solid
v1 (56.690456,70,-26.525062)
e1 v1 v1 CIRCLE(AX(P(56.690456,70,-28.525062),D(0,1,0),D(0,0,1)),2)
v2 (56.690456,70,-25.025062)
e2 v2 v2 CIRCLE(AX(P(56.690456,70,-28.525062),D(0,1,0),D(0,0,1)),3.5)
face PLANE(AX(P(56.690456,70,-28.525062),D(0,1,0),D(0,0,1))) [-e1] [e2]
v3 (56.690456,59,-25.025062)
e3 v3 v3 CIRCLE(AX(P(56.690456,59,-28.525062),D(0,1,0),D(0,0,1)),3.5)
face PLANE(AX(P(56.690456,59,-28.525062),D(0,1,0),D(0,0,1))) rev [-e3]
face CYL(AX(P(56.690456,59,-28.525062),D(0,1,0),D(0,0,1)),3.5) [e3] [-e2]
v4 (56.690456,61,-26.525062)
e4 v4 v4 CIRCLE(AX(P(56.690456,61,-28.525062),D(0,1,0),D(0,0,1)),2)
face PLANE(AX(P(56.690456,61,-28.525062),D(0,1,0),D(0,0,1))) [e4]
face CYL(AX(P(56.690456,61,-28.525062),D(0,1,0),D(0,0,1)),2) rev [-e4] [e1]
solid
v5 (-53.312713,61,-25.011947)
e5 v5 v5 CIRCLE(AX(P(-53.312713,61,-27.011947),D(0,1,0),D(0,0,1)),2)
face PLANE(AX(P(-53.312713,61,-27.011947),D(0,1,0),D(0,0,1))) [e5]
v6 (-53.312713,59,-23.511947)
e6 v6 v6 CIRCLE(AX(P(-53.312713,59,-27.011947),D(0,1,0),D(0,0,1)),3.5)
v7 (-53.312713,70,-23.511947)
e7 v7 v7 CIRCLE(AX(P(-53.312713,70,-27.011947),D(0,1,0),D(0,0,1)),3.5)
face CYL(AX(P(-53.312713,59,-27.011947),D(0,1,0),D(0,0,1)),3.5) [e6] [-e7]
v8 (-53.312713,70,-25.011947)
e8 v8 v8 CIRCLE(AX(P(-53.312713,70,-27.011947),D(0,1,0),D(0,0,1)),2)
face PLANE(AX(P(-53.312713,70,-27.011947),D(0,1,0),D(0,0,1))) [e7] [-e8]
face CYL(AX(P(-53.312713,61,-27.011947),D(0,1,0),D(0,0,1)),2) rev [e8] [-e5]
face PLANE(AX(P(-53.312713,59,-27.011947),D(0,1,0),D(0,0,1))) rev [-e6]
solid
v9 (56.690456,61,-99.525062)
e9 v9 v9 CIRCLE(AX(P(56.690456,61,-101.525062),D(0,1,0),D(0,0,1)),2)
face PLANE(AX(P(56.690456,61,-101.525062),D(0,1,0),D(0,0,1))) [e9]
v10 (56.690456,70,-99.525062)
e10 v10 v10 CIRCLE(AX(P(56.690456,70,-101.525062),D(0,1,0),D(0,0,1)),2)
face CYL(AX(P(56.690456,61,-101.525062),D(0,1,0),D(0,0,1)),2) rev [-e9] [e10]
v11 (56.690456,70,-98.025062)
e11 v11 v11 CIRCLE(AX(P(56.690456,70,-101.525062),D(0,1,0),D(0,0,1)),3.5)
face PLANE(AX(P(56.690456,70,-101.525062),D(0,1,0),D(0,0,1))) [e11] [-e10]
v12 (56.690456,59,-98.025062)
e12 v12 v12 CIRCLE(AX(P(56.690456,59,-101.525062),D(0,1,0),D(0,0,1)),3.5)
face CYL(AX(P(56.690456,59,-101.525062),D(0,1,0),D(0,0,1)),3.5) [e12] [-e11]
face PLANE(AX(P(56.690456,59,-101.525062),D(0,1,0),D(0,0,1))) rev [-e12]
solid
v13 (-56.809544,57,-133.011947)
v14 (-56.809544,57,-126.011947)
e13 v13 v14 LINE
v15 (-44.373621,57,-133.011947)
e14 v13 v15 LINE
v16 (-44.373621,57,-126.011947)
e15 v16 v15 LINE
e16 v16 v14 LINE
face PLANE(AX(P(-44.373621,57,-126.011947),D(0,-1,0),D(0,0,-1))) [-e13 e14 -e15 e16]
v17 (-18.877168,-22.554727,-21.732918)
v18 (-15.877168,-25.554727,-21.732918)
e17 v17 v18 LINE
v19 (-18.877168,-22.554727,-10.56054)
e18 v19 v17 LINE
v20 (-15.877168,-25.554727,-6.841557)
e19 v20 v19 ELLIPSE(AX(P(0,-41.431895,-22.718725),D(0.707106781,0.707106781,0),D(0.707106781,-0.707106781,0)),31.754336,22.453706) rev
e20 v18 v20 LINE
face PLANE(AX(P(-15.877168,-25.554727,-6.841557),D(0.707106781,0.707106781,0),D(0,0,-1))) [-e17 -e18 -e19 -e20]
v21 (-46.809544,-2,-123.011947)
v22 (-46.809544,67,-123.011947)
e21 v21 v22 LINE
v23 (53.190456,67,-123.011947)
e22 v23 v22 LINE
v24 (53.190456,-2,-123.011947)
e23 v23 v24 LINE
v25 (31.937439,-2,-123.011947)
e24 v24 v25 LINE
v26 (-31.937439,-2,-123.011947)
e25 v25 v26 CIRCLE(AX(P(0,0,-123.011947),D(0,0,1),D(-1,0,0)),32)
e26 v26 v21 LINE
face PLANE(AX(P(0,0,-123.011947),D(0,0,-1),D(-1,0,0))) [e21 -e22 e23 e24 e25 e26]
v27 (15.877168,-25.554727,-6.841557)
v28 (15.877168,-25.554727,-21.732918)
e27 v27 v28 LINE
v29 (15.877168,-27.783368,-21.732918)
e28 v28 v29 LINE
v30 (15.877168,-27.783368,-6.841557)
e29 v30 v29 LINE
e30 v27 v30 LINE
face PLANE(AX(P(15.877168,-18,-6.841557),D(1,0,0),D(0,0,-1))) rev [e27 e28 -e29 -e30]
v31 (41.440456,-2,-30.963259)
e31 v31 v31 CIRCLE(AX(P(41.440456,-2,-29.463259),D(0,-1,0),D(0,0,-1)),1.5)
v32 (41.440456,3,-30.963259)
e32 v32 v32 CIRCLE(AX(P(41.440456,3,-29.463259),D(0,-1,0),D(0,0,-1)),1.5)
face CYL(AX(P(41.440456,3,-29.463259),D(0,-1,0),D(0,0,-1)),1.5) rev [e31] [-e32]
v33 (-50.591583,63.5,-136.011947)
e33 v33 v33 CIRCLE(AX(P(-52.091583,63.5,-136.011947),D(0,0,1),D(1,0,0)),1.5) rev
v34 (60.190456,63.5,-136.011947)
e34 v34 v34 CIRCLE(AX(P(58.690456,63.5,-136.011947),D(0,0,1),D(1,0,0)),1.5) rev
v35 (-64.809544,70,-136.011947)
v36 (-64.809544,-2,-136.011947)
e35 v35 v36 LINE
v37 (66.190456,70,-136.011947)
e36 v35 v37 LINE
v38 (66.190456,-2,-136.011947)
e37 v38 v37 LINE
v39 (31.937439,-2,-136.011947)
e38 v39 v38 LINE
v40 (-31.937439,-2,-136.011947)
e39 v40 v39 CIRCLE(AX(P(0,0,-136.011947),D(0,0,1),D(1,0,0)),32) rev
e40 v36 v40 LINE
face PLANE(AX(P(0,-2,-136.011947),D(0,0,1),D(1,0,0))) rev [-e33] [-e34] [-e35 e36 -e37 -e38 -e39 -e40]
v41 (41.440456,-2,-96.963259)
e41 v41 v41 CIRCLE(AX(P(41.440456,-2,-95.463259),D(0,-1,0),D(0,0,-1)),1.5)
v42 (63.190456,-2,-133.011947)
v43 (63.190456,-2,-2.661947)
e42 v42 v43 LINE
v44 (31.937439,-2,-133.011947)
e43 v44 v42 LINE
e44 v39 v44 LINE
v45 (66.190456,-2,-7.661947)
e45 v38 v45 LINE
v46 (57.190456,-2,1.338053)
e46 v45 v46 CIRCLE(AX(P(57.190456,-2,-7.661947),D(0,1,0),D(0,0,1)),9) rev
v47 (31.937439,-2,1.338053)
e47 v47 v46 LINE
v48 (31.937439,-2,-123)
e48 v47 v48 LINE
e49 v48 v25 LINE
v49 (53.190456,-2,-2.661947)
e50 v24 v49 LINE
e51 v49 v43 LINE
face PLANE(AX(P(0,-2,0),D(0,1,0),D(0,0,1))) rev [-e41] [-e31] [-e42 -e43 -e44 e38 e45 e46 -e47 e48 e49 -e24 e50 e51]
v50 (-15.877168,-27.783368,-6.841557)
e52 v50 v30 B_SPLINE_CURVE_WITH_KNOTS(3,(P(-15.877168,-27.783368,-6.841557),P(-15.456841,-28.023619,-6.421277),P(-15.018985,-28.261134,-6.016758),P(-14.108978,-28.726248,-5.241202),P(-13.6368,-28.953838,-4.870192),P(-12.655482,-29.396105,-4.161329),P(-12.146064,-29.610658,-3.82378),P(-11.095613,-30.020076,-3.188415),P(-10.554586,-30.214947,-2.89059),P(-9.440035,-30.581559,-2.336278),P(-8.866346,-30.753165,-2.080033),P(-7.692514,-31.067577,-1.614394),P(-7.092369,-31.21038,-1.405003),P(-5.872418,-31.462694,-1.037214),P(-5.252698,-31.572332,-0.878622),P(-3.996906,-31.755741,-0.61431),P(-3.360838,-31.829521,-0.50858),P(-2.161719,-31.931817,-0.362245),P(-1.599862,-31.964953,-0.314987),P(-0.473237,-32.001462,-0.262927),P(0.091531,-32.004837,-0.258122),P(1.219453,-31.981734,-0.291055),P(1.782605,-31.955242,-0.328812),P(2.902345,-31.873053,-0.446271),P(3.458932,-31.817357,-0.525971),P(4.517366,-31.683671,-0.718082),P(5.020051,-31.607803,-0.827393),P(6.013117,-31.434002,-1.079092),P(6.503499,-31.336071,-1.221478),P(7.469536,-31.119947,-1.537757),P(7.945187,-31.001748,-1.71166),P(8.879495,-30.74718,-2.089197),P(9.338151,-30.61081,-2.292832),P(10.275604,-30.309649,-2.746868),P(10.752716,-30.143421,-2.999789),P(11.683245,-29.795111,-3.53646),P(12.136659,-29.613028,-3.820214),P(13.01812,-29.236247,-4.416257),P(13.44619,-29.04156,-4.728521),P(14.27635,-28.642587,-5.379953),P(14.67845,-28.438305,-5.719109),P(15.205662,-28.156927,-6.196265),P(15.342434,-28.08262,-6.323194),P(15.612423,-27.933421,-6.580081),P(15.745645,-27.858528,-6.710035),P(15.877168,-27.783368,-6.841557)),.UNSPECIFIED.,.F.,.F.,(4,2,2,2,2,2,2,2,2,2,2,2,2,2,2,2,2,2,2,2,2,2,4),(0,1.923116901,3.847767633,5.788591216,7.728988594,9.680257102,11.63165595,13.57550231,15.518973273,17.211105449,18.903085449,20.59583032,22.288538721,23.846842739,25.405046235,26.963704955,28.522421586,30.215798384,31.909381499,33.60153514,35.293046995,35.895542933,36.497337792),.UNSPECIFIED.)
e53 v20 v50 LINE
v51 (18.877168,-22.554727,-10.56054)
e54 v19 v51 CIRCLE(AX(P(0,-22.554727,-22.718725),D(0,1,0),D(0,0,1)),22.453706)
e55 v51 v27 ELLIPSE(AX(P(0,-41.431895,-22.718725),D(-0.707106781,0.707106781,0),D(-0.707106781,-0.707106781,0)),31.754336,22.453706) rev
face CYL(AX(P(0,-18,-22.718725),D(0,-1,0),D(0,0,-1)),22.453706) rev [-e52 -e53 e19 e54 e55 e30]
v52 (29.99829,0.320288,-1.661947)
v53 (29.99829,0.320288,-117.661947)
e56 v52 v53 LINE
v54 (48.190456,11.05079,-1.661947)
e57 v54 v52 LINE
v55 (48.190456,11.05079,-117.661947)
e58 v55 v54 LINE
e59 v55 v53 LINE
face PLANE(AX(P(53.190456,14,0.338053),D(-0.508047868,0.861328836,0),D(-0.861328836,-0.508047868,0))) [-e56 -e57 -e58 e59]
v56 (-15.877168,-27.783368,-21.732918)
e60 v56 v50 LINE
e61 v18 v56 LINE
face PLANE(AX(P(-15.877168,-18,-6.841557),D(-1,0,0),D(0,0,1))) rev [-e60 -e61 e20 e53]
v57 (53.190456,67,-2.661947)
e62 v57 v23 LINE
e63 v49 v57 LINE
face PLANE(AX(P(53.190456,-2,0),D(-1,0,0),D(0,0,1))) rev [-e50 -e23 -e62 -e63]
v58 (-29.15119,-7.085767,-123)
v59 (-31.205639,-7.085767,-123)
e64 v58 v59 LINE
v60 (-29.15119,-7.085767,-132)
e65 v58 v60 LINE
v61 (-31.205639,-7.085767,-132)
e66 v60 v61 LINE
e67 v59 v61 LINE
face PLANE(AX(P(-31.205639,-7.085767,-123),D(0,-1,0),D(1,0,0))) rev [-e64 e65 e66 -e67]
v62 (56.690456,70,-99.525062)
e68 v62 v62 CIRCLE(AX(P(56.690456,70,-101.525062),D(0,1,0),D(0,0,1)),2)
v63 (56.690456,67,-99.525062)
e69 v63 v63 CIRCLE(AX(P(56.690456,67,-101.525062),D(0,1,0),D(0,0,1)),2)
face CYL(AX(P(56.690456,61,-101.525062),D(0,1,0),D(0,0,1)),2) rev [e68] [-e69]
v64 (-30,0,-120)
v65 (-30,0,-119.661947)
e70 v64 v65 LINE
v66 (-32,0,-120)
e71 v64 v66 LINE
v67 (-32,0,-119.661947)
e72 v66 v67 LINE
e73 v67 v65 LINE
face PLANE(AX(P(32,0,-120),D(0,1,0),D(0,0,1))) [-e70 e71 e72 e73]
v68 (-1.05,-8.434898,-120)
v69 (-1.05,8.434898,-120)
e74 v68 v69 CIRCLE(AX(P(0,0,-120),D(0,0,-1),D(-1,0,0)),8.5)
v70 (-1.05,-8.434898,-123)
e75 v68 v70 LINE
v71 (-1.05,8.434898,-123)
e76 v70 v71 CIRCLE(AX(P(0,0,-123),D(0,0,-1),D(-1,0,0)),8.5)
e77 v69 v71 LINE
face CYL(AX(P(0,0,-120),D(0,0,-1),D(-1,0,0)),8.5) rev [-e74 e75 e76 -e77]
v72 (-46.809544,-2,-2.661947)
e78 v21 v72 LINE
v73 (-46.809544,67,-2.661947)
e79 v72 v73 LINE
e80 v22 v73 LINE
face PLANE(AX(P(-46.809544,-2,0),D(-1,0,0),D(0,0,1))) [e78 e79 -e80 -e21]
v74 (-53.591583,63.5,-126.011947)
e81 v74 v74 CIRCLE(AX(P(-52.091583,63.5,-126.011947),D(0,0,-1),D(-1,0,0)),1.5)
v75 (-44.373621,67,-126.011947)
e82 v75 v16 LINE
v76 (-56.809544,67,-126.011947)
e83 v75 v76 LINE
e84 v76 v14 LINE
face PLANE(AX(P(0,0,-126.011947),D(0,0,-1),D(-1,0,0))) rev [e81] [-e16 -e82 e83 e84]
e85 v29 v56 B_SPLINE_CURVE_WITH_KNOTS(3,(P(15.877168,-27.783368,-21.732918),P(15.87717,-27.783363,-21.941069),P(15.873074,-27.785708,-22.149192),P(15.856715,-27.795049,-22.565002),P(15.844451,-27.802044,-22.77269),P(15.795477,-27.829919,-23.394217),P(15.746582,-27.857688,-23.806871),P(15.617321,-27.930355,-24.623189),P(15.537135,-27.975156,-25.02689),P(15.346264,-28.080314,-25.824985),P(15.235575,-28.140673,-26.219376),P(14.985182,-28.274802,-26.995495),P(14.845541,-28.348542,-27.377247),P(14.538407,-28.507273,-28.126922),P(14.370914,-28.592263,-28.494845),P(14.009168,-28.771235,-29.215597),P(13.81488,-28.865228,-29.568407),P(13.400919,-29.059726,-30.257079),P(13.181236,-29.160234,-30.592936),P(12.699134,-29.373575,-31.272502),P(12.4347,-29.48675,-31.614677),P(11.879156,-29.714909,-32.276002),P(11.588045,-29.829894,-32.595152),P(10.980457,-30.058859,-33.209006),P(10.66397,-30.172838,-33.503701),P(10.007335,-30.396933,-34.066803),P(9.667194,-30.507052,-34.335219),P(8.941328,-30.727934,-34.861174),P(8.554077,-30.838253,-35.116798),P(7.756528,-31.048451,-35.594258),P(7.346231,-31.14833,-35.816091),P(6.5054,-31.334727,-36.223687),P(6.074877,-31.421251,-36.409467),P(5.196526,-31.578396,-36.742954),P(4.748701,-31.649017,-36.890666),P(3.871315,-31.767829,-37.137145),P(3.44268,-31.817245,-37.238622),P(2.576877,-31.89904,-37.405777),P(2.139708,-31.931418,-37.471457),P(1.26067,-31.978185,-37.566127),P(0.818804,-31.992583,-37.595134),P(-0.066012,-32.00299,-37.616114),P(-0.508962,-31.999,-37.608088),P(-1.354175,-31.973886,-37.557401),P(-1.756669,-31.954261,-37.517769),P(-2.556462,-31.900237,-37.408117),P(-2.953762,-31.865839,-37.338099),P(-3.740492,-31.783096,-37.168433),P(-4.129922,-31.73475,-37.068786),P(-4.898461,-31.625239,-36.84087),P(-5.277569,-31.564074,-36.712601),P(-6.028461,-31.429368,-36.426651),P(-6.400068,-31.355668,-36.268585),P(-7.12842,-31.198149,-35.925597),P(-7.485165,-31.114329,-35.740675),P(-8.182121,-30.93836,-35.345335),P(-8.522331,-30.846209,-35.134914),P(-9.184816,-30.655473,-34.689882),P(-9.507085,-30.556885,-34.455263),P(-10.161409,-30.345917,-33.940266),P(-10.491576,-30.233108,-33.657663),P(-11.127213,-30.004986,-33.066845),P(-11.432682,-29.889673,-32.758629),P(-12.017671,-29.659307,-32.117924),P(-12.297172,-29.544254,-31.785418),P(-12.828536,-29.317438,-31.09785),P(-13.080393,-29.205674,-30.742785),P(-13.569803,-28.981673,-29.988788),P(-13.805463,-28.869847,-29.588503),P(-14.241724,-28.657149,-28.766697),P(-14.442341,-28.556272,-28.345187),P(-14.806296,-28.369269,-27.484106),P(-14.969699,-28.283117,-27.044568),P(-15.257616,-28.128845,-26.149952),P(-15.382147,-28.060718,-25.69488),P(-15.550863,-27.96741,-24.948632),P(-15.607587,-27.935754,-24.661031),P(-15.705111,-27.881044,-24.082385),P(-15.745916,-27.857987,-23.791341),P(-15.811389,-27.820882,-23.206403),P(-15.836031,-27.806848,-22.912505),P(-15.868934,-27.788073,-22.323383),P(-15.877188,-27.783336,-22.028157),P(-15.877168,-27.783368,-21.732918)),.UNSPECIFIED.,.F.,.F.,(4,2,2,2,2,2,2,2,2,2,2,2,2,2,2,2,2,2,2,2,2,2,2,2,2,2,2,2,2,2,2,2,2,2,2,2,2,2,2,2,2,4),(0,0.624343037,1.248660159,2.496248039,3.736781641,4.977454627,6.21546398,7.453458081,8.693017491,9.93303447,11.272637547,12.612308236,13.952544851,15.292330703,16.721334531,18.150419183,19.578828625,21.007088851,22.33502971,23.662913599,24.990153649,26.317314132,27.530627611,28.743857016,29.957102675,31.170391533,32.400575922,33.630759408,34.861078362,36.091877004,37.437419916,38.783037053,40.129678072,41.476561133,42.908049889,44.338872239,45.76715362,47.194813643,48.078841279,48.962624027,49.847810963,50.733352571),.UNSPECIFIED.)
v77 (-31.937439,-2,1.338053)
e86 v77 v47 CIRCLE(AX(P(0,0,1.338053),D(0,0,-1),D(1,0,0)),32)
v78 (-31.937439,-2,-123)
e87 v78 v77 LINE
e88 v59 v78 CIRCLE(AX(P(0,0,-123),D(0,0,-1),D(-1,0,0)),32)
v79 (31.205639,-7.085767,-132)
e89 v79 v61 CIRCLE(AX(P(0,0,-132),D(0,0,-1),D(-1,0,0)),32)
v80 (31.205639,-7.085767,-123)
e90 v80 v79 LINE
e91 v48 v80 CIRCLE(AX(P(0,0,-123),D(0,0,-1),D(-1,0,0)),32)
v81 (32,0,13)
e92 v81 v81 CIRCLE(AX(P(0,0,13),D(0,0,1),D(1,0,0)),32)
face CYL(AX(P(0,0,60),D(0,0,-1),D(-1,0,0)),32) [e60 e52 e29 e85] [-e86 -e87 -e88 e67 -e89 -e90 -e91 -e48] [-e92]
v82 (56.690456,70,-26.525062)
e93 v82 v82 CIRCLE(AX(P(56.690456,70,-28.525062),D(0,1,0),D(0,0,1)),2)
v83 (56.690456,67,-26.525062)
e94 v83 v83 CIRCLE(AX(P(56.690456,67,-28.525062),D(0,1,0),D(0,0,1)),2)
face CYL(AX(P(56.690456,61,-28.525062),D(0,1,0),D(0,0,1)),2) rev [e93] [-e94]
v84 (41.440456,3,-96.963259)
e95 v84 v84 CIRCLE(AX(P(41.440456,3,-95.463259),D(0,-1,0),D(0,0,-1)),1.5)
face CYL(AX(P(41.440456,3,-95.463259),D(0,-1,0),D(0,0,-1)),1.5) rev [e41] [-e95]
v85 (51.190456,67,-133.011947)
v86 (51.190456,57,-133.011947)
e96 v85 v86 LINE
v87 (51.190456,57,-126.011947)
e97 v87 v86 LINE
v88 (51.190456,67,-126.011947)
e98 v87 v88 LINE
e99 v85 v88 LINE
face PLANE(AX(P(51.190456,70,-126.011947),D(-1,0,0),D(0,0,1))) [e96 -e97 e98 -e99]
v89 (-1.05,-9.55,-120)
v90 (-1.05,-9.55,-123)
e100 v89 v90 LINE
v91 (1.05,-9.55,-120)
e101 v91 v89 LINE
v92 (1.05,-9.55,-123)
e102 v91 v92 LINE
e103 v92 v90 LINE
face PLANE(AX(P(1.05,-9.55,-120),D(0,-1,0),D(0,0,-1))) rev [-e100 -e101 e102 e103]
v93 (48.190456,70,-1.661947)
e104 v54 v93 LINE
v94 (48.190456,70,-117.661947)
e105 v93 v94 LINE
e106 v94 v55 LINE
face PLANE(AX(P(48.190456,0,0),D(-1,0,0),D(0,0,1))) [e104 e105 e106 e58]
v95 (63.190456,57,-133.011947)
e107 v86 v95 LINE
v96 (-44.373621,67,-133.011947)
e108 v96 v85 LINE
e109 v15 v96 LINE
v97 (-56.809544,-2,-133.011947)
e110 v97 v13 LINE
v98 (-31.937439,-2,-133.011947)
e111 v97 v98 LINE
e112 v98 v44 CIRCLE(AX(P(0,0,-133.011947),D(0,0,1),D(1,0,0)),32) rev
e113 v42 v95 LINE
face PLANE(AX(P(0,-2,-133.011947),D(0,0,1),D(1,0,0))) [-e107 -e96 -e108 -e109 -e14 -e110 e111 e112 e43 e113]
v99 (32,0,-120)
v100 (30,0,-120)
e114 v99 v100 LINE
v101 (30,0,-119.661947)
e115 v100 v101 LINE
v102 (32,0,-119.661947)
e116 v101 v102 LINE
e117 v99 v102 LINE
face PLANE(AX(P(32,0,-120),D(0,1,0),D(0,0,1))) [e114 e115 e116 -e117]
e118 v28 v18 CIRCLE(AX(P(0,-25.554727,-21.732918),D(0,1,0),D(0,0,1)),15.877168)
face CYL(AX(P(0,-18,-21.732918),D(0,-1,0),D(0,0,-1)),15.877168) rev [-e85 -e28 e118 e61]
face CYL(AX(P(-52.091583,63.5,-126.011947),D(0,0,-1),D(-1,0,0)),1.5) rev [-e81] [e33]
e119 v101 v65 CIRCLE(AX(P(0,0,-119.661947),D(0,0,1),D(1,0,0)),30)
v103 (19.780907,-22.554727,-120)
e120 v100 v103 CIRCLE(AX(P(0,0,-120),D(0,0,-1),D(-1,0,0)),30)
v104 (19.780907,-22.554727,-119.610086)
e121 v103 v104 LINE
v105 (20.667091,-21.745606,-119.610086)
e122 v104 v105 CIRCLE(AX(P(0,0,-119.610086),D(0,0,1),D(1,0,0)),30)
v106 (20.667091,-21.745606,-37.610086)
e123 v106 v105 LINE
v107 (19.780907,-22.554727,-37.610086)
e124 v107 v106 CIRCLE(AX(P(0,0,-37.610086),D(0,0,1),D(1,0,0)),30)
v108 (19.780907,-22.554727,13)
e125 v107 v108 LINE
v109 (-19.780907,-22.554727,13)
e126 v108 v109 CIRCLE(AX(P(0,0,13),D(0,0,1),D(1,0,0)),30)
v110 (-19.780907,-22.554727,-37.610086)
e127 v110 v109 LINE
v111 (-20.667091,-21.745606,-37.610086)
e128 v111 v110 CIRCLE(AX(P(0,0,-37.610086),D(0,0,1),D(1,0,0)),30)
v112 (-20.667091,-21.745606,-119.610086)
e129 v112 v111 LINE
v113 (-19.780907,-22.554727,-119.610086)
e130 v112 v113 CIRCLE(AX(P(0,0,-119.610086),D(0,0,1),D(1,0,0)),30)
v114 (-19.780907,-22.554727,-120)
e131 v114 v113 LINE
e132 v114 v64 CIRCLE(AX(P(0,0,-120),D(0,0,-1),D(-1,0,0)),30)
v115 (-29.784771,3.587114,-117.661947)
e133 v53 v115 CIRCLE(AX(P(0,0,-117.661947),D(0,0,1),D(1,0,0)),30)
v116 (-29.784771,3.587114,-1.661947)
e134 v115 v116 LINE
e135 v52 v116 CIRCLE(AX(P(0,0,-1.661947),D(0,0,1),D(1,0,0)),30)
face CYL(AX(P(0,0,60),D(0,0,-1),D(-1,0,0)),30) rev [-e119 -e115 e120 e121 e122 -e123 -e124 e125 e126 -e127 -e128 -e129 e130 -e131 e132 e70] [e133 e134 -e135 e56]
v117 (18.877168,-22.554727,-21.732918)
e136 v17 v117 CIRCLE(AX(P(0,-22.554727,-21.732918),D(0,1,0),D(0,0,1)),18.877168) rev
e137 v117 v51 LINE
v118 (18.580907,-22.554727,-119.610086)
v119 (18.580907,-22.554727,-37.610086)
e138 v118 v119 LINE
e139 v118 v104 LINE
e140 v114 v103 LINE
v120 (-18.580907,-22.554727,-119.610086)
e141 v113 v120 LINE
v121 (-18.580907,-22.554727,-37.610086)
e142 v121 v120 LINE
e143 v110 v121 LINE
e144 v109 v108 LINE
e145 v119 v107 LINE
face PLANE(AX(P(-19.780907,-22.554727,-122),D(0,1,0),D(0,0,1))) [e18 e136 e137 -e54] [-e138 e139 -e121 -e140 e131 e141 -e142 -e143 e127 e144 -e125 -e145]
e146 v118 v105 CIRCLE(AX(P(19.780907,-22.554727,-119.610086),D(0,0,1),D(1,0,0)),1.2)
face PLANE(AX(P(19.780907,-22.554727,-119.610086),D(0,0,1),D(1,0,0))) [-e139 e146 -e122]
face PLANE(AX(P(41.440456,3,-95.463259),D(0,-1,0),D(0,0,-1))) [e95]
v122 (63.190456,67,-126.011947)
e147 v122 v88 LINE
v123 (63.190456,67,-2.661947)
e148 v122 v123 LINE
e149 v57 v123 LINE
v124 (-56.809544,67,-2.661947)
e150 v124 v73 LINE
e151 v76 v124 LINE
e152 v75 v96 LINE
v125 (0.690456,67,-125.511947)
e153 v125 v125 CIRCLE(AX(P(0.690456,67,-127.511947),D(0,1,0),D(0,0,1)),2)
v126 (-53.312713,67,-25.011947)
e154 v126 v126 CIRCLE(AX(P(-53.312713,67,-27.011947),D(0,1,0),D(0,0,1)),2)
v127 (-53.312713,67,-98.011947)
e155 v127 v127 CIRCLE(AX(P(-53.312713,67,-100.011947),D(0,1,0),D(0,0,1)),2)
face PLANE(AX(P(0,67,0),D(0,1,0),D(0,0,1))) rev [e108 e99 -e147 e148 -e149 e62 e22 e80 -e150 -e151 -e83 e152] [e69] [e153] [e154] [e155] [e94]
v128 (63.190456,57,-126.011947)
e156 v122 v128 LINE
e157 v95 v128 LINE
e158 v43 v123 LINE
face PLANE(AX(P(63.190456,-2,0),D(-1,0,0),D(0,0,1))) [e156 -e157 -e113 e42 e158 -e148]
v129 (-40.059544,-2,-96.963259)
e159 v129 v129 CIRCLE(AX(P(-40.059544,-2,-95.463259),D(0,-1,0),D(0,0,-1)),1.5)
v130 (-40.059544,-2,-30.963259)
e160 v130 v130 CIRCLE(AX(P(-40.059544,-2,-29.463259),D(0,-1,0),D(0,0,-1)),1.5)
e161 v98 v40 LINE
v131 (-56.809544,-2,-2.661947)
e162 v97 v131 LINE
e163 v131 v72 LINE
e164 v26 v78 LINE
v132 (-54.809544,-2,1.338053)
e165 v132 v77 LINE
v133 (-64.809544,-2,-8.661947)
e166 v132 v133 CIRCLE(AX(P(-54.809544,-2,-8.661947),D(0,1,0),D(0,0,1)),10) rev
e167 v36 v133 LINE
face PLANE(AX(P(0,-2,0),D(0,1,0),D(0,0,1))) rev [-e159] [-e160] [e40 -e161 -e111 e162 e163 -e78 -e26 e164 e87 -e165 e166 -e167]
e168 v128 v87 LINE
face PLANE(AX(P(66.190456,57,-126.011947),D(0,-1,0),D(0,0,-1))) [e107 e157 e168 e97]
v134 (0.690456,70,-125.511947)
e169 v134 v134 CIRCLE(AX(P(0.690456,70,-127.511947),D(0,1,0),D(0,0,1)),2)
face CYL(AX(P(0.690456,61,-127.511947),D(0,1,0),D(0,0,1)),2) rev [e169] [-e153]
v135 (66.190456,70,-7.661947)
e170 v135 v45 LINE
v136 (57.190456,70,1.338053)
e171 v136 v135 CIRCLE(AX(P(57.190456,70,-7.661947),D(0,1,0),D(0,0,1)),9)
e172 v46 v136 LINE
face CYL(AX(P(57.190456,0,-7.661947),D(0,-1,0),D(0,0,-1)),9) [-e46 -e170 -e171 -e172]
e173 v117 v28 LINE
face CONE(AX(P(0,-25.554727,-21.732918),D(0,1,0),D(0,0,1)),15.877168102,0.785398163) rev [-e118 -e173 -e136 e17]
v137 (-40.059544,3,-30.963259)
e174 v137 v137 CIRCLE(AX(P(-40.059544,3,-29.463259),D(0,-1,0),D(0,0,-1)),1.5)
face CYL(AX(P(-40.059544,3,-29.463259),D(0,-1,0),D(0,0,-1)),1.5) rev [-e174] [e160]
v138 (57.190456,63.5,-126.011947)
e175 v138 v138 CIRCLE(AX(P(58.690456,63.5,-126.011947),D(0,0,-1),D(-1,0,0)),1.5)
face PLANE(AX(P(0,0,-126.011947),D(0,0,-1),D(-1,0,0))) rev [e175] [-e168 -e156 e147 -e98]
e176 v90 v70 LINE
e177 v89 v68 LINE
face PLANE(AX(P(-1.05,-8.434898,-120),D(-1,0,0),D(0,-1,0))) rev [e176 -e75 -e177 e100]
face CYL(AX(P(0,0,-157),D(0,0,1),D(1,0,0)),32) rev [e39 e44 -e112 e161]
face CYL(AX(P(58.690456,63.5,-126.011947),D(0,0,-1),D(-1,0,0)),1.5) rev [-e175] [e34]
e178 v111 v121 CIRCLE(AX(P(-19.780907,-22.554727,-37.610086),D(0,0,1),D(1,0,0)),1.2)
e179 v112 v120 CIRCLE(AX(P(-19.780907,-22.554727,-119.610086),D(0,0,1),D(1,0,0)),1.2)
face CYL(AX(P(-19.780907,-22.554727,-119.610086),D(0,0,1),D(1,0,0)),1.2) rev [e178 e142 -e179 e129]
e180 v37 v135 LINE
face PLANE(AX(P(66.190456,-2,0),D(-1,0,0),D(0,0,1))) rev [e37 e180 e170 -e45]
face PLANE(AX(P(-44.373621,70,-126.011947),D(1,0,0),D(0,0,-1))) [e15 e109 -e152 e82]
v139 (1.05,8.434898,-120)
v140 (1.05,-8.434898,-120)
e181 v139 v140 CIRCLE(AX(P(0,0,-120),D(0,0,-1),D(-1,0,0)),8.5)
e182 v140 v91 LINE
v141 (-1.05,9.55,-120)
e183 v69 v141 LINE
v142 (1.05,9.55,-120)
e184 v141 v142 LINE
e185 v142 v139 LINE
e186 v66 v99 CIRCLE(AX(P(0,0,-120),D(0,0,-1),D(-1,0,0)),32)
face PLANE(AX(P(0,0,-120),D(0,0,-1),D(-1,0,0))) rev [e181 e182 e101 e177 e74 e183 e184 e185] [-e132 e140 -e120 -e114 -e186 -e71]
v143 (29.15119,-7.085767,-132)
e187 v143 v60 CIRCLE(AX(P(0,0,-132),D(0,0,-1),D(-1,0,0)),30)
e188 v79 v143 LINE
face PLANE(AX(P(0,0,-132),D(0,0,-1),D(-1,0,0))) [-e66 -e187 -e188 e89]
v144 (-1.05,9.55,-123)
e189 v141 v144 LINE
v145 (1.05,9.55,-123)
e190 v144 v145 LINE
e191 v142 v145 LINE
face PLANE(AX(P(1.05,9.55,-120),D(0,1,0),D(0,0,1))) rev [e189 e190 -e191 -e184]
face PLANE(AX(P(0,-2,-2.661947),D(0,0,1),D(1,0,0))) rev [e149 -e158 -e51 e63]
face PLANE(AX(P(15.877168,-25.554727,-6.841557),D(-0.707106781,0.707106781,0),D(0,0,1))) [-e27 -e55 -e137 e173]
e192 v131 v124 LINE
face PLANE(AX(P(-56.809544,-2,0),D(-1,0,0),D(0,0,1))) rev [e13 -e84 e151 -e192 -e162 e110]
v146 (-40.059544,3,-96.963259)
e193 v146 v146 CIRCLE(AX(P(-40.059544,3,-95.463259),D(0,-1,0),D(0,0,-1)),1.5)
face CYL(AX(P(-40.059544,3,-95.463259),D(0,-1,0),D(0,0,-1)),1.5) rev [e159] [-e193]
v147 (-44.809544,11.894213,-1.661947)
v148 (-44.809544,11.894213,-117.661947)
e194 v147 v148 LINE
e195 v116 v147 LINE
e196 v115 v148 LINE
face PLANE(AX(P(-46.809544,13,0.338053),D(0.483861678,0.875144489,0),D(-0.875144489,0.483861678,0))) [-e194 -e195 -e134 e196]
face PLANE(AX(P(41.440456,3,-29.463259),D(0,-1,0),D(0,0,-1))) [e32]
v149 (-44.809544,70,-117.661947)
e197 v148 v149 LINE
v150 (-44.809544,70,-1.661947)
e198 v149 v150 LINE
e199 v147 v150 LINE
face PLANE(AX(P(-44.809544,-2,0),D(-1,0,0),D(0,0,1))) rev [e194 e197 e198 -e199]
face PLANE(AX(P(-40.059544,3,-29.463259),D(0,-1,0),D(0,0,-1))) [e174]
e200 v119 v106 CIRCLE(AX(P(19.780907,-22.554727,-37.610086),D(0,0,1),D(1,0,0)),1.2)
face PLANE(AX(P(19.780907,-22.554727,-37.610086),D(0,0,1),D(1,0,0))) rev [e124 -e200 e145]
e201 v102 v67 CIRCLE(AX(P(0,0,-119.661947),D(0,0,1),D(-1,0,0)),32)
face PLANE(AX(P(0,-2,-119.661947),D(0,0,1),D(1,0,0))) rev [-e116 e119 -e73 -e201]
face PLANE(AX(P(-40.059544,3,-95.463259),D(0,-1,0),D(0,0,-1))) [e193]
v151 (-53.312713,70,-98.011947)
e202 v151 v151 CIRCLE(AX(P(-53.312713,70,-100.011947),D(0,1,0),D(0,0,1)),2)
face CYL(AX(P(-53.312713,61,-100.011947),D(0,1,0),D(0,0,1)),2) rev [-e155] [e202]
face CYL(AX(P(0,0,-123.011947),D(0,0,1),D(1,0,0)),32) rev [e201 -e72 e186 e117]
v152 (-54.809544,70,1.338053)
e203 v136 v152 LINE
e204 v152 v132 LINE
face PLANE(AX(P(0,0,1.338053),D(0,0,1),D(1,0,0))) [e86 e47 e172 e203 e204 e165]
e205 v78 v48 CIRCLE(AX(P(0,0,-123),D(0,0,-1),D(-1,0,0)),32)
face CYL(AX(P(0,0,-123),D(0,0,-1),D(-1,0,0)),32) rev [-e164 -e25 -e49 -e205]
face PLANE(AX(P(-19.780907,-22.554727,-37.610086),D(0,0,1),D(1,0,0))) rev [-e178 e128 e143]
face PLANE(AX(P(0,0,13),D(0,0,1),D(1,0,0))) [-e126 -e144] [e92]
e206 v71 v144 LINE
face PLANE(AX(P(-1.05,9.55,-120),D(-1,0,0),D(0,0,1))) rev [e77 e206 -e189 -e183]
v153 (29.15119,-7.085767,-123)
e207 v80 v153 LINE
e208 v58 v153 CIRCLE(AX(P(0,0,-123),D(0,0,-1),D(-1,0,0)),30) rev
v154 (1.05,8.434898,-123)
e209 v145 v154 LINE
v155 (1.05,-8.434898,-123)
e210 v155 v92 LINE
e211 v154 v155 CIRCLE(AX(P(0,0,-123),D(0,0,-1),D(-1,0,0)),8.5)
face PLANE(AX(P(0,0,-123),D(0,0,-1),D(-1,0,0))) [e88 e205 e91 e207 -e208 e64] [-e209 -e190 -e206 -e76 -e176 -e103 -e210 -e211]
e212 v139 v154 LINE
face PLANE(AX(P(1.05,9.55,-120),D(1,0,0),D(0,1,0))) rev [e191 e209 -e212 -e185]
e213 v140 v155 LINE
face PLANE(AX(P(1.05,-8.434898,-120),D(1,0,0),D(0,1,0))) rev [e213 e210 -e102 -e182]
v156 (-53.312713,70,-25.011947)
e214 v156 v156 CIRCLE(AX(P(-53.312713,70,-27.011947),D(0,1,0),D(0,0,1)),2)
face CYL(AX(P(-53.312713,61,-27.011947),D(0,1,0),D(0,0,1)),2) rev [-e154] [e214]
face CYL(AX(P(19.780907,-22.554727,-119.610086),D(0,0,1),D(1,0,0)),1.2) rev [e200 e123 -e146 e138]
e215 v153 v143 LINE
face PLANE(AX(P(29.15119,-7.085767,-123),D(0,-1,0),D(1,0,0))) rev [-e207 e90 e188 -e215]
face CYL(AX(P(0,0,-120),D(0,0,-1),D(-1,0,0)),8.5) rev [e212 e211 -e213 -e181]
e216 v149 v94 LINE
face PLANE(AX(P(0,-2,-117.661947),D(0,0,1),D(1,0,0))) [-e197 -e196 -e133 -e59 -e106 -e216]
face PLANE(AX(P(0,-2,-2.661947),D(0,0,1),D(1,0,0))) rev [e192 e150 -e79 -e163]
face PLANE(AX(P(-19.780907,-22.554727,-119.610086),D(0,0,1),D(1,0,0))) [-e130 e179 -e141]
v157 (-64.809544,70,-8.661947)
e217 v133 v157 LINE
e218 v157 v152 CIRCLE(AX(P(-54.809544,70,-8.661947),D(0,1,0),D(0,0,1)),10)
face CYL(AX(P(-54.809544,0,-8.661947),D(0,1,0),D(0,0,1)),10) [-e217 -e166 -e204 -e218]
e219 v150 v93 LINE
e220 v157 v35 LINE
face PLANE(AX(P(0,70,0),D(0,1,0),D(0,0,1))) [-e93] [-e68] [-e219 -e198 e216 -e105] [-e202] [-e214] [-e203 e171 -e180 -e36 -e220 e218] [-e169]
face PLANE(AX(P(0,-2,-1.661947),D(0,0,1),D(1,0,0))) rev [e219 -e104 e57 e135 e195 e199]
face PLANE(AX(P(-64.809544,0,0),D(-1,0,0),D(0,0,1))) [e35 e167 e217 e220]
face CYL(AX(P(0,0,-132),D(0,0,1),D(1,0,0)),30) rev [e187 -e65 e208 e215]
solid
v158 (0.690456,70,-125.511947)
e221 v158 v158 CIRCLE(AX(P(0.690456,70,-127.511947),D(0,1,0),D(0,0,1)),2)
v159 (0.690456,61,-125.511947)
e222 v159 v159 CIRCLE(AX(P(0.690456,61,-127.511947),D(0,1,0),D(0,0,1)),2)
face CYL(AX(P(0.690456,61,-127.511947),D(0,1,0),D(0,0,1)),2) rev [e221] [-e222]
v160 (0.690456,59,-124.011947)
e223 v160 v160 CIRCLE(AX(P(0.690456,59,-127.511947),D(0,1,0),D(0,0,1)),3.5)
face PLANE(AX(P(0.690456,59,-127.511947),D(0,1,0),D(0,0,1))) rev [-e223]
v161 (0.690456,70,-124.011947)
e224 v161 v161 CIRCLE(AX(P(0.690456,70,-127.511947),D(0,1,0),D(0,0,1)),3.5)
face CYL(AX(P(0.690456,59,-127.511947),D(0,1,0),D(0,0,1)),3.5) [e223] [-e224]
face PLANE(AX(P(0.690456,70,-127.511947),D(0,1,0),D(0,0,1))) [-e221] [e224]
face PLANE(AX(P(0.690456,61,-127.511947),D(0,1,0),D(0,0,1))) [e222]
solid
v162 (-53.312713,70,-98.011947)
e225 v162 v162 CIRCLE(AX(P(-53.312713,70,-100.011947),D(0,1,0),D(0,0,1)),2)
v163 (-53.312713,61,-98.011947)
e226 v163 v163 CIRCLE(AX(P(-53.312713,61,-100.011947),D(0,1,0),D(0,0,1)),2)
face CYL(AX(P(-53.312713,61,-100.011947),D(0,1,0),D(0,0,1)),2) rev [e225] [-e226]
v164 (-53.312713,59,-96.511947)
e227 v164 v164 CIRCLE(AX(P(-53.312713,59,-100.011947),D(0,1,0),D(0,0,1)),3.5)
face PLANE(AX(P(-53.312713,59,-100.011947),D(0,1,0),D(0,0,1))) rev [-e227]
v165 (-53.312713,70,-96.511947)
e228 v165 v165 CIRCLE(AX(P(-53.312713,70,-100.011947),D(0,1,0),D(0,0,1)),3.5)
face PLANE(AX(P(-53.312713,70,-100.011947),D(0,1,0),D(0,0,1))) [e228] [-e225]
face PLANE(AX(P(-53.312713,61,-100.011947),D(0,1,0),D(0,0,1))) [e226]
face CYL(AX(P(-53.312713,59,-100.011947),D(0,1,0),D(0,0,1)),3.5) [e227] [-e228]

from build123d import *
from build123d.topology import SkipClean

# Parameters (mm, degrees)
SKETCH1_R                = 32
SKETCH1_R_2              = 30
BOSS_EXTRUDE1_DEPTH      = 60
BOSS_EXTRUDE3_START      = 120
BOSS_EXTRUDE3_DEPTH      = 120
BOSS_EXTRUDE4_START      = 3
SKETCH4_R                = 32
BOSS_EXTRUDE4_DEPTH      = 3
CUT_EXTRUDE2_DEPTH       = 3
SKETCH6_W                = 63.995066004
SKETCH6_H                = 2
SKETCH6_H_2              = 1.661946758
BOSS_EXTRUDE11_DEPTH     = 2
SKETCH6_8_W              = 63.995066004
SKETCH6_8_H              = 2
SKETCH6_8_H_2            = 1.661946758
BOSS_EXTRUDE12_DEPTH     = 70
BOSS_EXTRUDE14_DEPTH     = 120
CUT_EXTRUDE3_START       = -180
SKETCH10_R               = 30
CUT_EXTRUDE3_DEPTH       = 180
BOSS_EXTRUDE16_START     = -71
BOSS_EXTRUDE16_DEPTH     = 71
CUT_EXTRUDE6_START       = -69
CUT_EXTRUDE6_DEPTH       = 69
BOSS_EXTRUDE17_START     = 3.35
BOSS_EXTRUDE17_DEPTH     = 3.35
CUT_EXTRUDE11_START      = -71
CUT_EXTRUDE11_DEPTH      = 2
SKETCH16_W               = 37
SKETCH16_H               = 64
CUT_EXTRUDE15_DEPTH      = 94
CUT_EXTRUDE16_DEPTH      = 34
BOSS_EXTRUDE20_DEPTH     = 72
BOSS_EXTRUDE21_DEPTH     = 3
CUT_EXTRUDE17_START      = 34
SKETCH21_R               = 32
CUT_EXTRUDE17_DEPTH      = 34
SKETCH22_W               = 15
SKETCH22_H               = 13
SKETCH22_R               = 1.5
SKETCH22_W_2             = 15.435922779
BOSS_EXTRUDE23_DEPTH     = 10
CUT_EXTRUDE19_DEPTH      = 20
CUT_EXTRUDE19_DEPTH_BACK = 17
SKETCH22_2_R             = 1.5
BOSS_EXTRUDE24_START     = -145
BOSS_EXTRUDE24_DEPTH     = 145
SKETCH25_R               = 1.2
CUT_EXTRUDE21_DEPTH      = 82
CUT_EXTRUDE22_DEPTH      = 36
BOSS_EXTRUDE34_DEPTH     = 1
SKETCH30_W               = 137.35
SKETCH30_H               = 72
BOSS_EXTRUDE35_DEPTH     = 5
BOSS_EXTRUDE38_DEPTH     = 3
SKETCH34_R               = 1.5
CUT_EXTRUDE24_DEPTH      = 5
BOSS_EXTRUDE45_START     = 9
BOSS_EXTRUDE45_DEPTH     = 9
CUT_EXTRUDE30_DEPTH      = 9
CUT_EXTRUDE31_START      = -10
SKETCH37_R               = 32
CUT_EXTRUDE31_DEPTH      = 10
SKETCH38_R               = 3.5
BOSS_EXTRUDE64_DEPTH     = 11
BOSS_EXTRUDE64_2_DEPTH   = 11
BOSS_EXTRUDE64_3_DEPTH   = 11
BOSS_EXTRUDE64_4_DEPTH   = 11
BOSS_EXTRUDE64_5_DEPTH   = 11
SKETCH38_8_R             = 2
CUT_EXTRUDE33_DEPTH      = 9
CHAMFER1_SIZE            = 3
FILLET1_R                = 10
FILLET2_R                = 9


# Read off the part's stored shape, not the designer's step: Cut-Extrude11
with BuildPart() as part:
    # Sketch1 → Boss-Extrude1 (new body)
    with BuildSketch(Plane.XY):
        Circle(SKETCH1_R)
        Circle(SKETCH1_R_2, mode=Mode.SUBTRACT)
    extrude(amount=BOSS_EXTRUDE1_DEPTH)

    # Sketch3 → Boss-Extrude3 (add)
    with BuildSketch(Plane(origin=(0, 0, 0), x_dir=(-1, 0, 0), z_dir=(0, 0, -1)).offset(BOSS_EXTRUDE3_START)):
        with BuildLine():
            Line((-32, 0), (-30, 0))
            ThreePointArc((-30, 0), (0, -30), (30, 0))
            Line((30, 0), (32, 0))
            ThreePointArc((32, 0), (0, -32), (-32, 0))
        make_face()
    extrude(amount=-BOSS_EXTRUDE3_DEPTH)

    # Sketch4 → Boss-Extrude4 (add)
    with SkipClean():  # the faces are left unmerged after this step: merging them gives an invalid solid
        with BuildSketch(Plane(origin=(0, 0, -120), x_dir=(-1, 0, 0), z_dir=(0, 0, -1)).offset(BOSS_EXTRUDE4_START)):
            Circle(SKETCH4_R)
        extrude(amount=-BOSS_EXTRUDE4_DEPTH)

    # Sketch5 → Cut-Extrude2 (cut)
    with SkipClean():  # the faces are left unmerged after this step: merging them gives an invalid solid
        with BuildSketch(Plane(origin=(0, 0, -123), x_dir=(-1, 0, 0), z_dir=(0, 0, -1))):
            with BuildLine():
                Line((-1.05, 9.55), (1.05, 9.55))
                Line((1.05, 9.55), (1.05, 8.434897747))
                ThreePointArc((1.05, 8.434897747), (8.5, 0), (1.05, -8.434897747))
                Line((1.05, -8.434897747), (1.05, -9.55))
                Line((1.05, -9.55), (-1.05, -9.55))
                Line((-1.05, -9.55), (-1.05, -8.434897747))
                ThreePointArc((-1.05, -8.434897747), (-8.5, 0), (-1.05, 8.434897747))
                Line((-1.05, 8.434897747), (-1.05, 9.55))
            make_face()
        extrude(amount=-CUT_EXTRUDE2_DEPTH, mode=Mode.SUBTRACT)

    # Sketch6 → Boss-Extrude11 (add)
    with SkipClean():  # the faces are left unmerged after this step: merging them gives an invalid solid
        with BuildSketch(Plane(origin=(0, 0, 0), x_dir=(1, 0, 0), z_dir=(0, 1, 0))):
            Polygon((31.995066004, 0), (-32, 0), (-32, 1.661946758), (-44.809543956, 1.661946758), (-44.809543956, 117.661946758), (-32, 117.661946758), (-32, 119.661946758), (-46.809543956, 119.661946758), (-46.809543956, -0.338053242), (53.190456044, -0.338053242), (53.190456044, 119.661946758), (31.995066004, 119.661946758), (31.995066004, 117.661946758), (51.190456044, 117.661946758), (51.190456044, 1.661946758), (31.995066004, 1.661946758), align=None)
            with Locations((-0.002466998, 118.661946758)):
                Rectangle(SKETCH6_W, SKETCH6_H)
            with Locations((-0.002466998, 0.830973379)):
                Rectangle(SKETCH6_W, SKETCH6_H_2)
        extrude(amount=-BOSS_EXTRUDE11_DEPTH)

    # Sketch6<8> → Boss-Extrude12 (add)
    with SkipClean():  # the faces are left unmerged after this step: merging them gives an invalid solid
        with BuildSketch(Plane(origin=(0, 0, 0), x_dir=(1, 0, 0), z_dir=(0, 1, 0))):
            with Locations((-0.002466998, 118.661946758)):
                Rectangle(SKETCH6_8_W, SKETCH6_8_H)
            Polygon((31.995066004, 0), (-32, 0), (-32, 1.661946758), (-44.809543956, 1.661946758), (-44.809543956, 117.661946758), (-32, 117.661946758), (-32, 119.661946758), (-46.809543956, 119.661946758), (-46.809543956, -0.338053242), (53.190456044, -0.338053242), (53.190456044, 119.661946758), (31.995066004, 119.661946758), (31.995066004, 117.661946758), (51.190456044, 117.661946758), (51.190456044, 1.661946758), (31.995066004, 1.661946758), align=None)
            with Locations((-0.002466998, 0.830973379)):
                Rectangle(SKETCH6_8_W, SKETCH6_8_H_2)
        extrude(amount=BOSS_EXTRUDE12_DEPTH)

    # Sketch8 → Boss-Extrude14 (add)
    with BuildSketch(Plane(origin=(0, 0, -119.661946758), x_dir=(-1, 0, 0), z_dir=(0, 0, -1))):
        Polygon((46.809543956, 13), (19.679543956, -2), (46.809543956, -2), align=None)
        Polygon((-53.190456044, -2), (-26.064544809, -2), (-53.190456044, 14), align=None)
    extrude(amount=-BOSS_EXTRUDE14_DEPTH)

    # Sketch10 → Cut-Extrude3 (cut)
    with BuildSketch(Plane.XY.offset(60).offset(CUT_EXTRUDE3_START)):
        Circle(SKETCH10_R)
    extrude(amount=CUT_EXTRUDE3_DEPTH, mode=Mode.SUBTRACT)

    # Sketch12<4> → Boss-Extrude16 (add)
    with BuildSketch(Plane.XY.offset(60).offset(BOSS_EXTRUDE16_START)):
        with BuildLine():
            ThreePointArc((-10.994606962, -30.051932013), (0, -37.894244713), (10.994606962, -30.051932013))
            ThreePointArc((10.994606962, -30.051932013), (0, -32), (-10.994606962, -30.051932013))
        make_face()
    extrude(amount=BOSS_EXTRUDE16_DEPTH)

    # Sketch12<5> → Cut-Extrude6 (cut)
    with BuildSketch(Plane.XY.offset(60).offset(CUT_EXTRUDE6_START)):
        with BuildLine():
            ThreePointArc((-10.994606962, -30.051932013), (0, -37.894244713), (10.994606962, -30.051932013))
            ThreePointArc((10.994606962, -30.051932013), (0, -32), (-10.994606962, -30.051932013))
        make_face()
    extrude(amount=CUT_EXTRUDE6_DEPTH, mode=Mode.SUBTRACT)

    # Sketch13 → Boss-Extrude17 (add)
    with BuildSketch(Plane(origin=(0, 0, -119.661946758), x_dir=(-1, 0, 0), z_dir=(0, 0, -1)).offset(BOSS_EXTRUDE17_START)):
        with BuildLine():
            Line((31.937438845, -2), (46.809543956, -2))
            Line((46.809543956, -2), (46.809543956, 70))
            Line((46.809543956, 70), (-53.190456044, 70))
            Line((-53.190456044, 70), (-53.190456044, -2))
            Line((-53.190456044, -2), (-31.937438845, -2))
            ThreePointArc((-31.937438845, -2), (0, 32), (31.937438845, -2))
        make_face()
    extrude(amount=-BOSS_EXTRUDE17_DEPTH)

    # Cut-Extrude11 outline → Cut-Extrude11 (cut)
    with BuildSketch(Plane.XY.offset(60).offset(CUT_EXTRUDE11_START)):
        with BuildLine():
            ThreePointArc((10.994606962, -30.051932014), (0, -32), (-10.994606962, -30.051932014))
            ThreePointArc((-10.994606962, -30.051932014), (0, -37.894244713), (10.994606962, -30.051932014))
        make_face()
    extrude(amount=CUT_EXTRUDE11_DEPTH, mode=Mode.SUBTRACT)

    # Sketch16 → Cut-Extrude15 (cut)
    with BuildSketch(Plane.ZY.offset(46.809543956)):
        with Locations((41.5, 0)):
            Rectangle(SKETCH16_W, SKETCH16_H)
    extrude(amount=-CUT_EXTRUDE15_DEPTH, mode=Mode.SUBTRACT)

    # Sketch18 → Cut-Extrude16 (cut)
    with BuildSketch(Plane(origin=(0, -52, 0), x_dir=(-1, 0, 0), z_dir=(0, -1, 0))):
        with BuildLine():
            Line((-15.877168102, 6.841556737), (-15.877168102, 21.732917961))
            ThreePointArc((-15.877168102, 21.732917961), (0, 37.610086063), (15.877168102, 21.732917961))
            Line((15.877168102, 21.732917961), (15.877168102, 6.841556737))
            ThreePointArc((15.877168102, 6.841556737), (0, 0.265018377), (-15.877168102, 6.841556737))
        make_face()
    extrude(amount=-CUT_EXTRUDE16_DEPTH, mode=Mode.SUBTRACT)

    # Sketch19 → Boss-Extrude20 (add)
    with BuildSketch(Plane(origin=(0, 70, 0), x_dir=(1, 0, 0), z_dir=(0, 1, 0))):
        Polygon((-56.809543956, 2.661946758), (-56.809543956, 133.011946758), (63.190456044, 133.011946758), (63.190456044, 2.661946758), (53.190456044, 2.661946758), (53.190456044, -0.338053242), (63.190456044, -0.338053242), (66.190456044, -0.338053242), (66.190456044, 136.011946758), (-59.809543956, 136.011946758), (-59.809543956, -0.338053242), (-56.809543956, -0.338053242), (-46.809543956, -0.338053242), (-46.809543956, 2.661946758), align=None)
    extrude(amount=-BOSS_EXTRUDE20_DEPTH)

    # Sketch19<4> → Boss-Extrude21 (add)
    with BuildSketch(Plane(origin=(0, 70, 0), x_dir=(1, 0, 0), z_dir=(0, 1, 0))):
        Polygon((63.190456044, 133.011946758), (-56.809543956, 133.011946758), (-56.809543956, 2.661946758), (-46.809543956, 2.661946758), (-46.809543956, 123.011946758), (53.190456044, 123.011946758), (53.190456044, 2.661946758), (63.190456044, 2.661946758), align=None)
    extrude(amount=-BOSS_EXTRUDE21_DEPTH)

    # Sketch21 → Cut-Extrude17 (cut)
    with BuildSketch(Plane(origin=(0, 0, -123), x_dir=(-1, 0, 0), z_dir=(0, 0, -1)).offset(CUT_EXTRUDE17_START)):
        Circle(SKETCH21_R)
    extrude(amount=-CUT_EXTRUDE17_DEPTH, mode=Mode.SUBTRACT)

    # Sketch22 → Boss-Extrude23 (add)
    # profile 1 of 2: a face of its own
    with BuildSketch(Plane(origin=(0, 0, -136.011946758), x_dir=(-1, 0, 0), z_dir=(0, 0, -1))):
        with Locations((-58.690456044, 63.5)):
            Rectangle(SKETCH22_W, SKETCH22_H)
        with Locations((-58.690456044, 63.5)):
            Circle(SKETCH22_R, mode=Mode.SUBTRACT)
    # profile 2 of 2: a face of its own
    with BuildSketch(Plane(origin=(0, 0, -136.011946758), x_dir=(-1, 0, 0), z_dir=(0, 0, -1))):
        with Locations((52.091582567, 63.5)):
            Rectangle(SKETCH22_W_2, SKETCH22_H)
        with Locations((52.091582567, 63.5)):
            Circle(SKETCH22_R, mode=Mode.SUBTRACT)
    extrude(amount=-BOSS_EXTRUDE23_DEPTH)

    # Sketch22<2> → Cut-Extrude19 (cut, two sides: drawn at the far end of the back side and taken through both)
    with BuildSketch(Plane(origin=(0, 0, -136.011946758), x_dir=(-1, 0, 0), z_dir=(0, 0, -1)).offset(-CUT_EXTRUDE19_DEPTH_BACK)):
        with Locations((-58.690456044, 63.5)):
            Circle(SKETCH22_2_R)
        with Locations((52.091582567, 63.5)):
            Circle(SKETCH22_2_R)
    extrude(amount=CUT_EXTRUDE19_DEPTH + CUT_EXTRUDE19_DEPTH_BACK, mode=Mode.SUBTRACT)

    # Sketch23 → Boss-Extrude24 (add)
    with BuildSketch(Plane.XY.offset(23).offset(BOSS_EXTRUDE24_START)):
        with BuildLine():
            Line((-19.78090681, -22.554727349), (19.78090681, -22.554727349))
            ThreePointArc((19.78090681, -22.554727349), (0, -30), (-19.78090681, -22.554727349))
        make_face()
    extrude(amount=BOSS_EXTRUDE24_DEPTH)

    # Sketch25 → Cut-Extrude21 (cut)
    with BuildSketch(Plane.XY.offset(-37.610086063)):
        with Locations((19.78090681, -22.554727349)):
            Circle(SKETCH25_R)
        with Locations((-19.78090681, -22.554727349)):
            Circle(SKETCH25_R)
    extrude(amount=-CUT_EXTRUDE21_DEPTH, mode=Mode.SUBTRACT)

    # Sketch18<3> → Cut-Extrude22 (cut)
    with BuildSketch(Plane(origin=(0, -52, 0), x_dir=(-1, 0, 0), z_dir=(0, -1, 0))):
        with BuildLine():
            Line((-15.877168102, 6.841556737), (-15.877168102, 21.732917961))
            ThreePointArc((-15.877168102, 21.732917961), (0, 37.610086063), (15.877168102, 21.732917961))
            Line((15.877168102, 21.732917961), (15.877168102, 6.841556737))
            ThreePointArc((15.877168102, 6.841556737), (0, 0.265018377), (-15.877168102, 6.841556737))
        make_face()
    extrude(amount=-CUT_EXTRUDE22_DEPTH, mode=Mode.SUBTRACT)

    # Sketch29 → Boss-Extrude34 (add)
    with BuildSketch(Plane.XY.offset(0.338053242)):
        with BuildLine():
            Line((-59.809543956, -2), (-31.937438845, -2))
            ThreePointArc((-31.937438845, -2), (0, 32), (31.937438845, -2))
            Line((31.937438845, -2), (66.190456044, -2))
            Line((66.190456044, -2), (66.190456044, 70))
            Line((66.190456044, 70), (-59.809543956, 70))
            Line((-59.809543956, 70), (-59.809543956, -2))
        make_face()
    extrude(amount=BOSS_EXTRUDE34_DEPTH)

    # Sketch30 → Boss-Extrude35 (add)
    with BuildSketch(Plane.ZY.offset(59.809543956)):
        with Locations((-67.336946758, 34)):
            Rectangle(SKETCH30_W, SKETCH30_H)
    extrude(amount=BOSS_EXTRUDE35_DEPTH)

    # Sketch32 → Boss-Extrude38 (add)
    with BuildSketch(Plane.ZY.offset(-51.190456044)):
        Polygon((-117.661946758, 12.820316128), (-117.661946758, 9.981913466), (-1.661946758, 9.981913466), (-1.661946758, 12.820316128), (-1.661946758, 70), (-117.661946758, 70), align=None)
    extrude(amount=BOSS_EXTRUDE38_DEPTH)

    # Sketch34 → Cut-Extrude24 (cut)
    with BuildSketch(Plane.XZ.offset(2)):
        with Locations(Location((-40.059543956, -95.463258513, 0), (0, 0, 270))):
            Circle(SKETCH34_R)
        with Locations(Location((-40.059543956, -29.463258513, 0), (0, 0, 270))):
            Circle(SKETCH34_R)
        with Locations(Location((41.440456044, -29.463258513, 0), (0, 0, 270))):
            Circle(SKETCH34_R)
        with Locations(Location((41.440456044, -95.463258513, 0), (0, 0, 270))):
            Circle(SKETCH34_R)
    extrude(amount=-CUT_EXTRUDE24_DEPTH, mode=Mode.SUBTRACT)

    # Sketch35 → Boss-Extrude45 (add)
    with BuildSketch(Plane(origin=(0, 0, -123), x_dir=(-1, 0, 0), z_dir=(0, 0, -1)).offset(BOSS_EXTRUDE45_START)):
        with BuildLine():
            Line((-29.933259094, -2), (-31.937438845, -2))
            ThreePointArc((-31.937438845, -2), (0, -32), (31.937438845, -2))
            Line((31.937438845, -2), (29.933259094, -2))
            ThreePointArc((29.933259094, -2), (0, -30), (-29.933259094, -2))
        make_face()
        with BuildLine():
            ThreePointArc((31.937438845, -2), (0, 32), (-31.937438845, -2))
            Line((-31.937438845, -2), (-29.933259094, -2))
            ThreePointArc((-29.933259094, -2), (-1.000556639, 29.983310131), (30, 0))
            ThreePointArc((30, 0), (29.983310131, -1.000556639), (29.933259094, -2))
            Line((29.933259094, -2), (31.937438845, -2))
        make_face()
    extrude(amount=-BOSS_EXTRUDE45_DEPTH)

    # Sketch36 → Cut-Extrude30 (cut)
    with BuildSketch(Plane(origin=(0, 0, -132), x_dir=(-1, 0, 0), z_dir=(0, 0, -1))):
        with BuildLine():
            Line((31.205638995, -7.085767068), (29.151190457, -7.085767068))
            ThreePointArc((29.151190457, -7.085767068), (0, 30), (-29.151190457, -7.085767068))
            Line((-29.151190457, -7.085767068), (-31.205638995, -7.085767068))
            ThreePointArc((-31.205638995, -7.085767068), (0, 32), (31.205638995, -7.085767068))
        make_face()
    extrude(amount=-CUT_EXTRUDE30_DEPTH, mode=Mode.SUBTRACT)

    # Sketch37 → Cut-Extrude31 (cut)
    with BuildSketch(Plane.XY.offset(23).offset(CUT_EXTRUDE31_START)):
        with Locations(Location((0, 0, 0), (0, 0, 183.583321698))):
            Circle(SKETCH37_R)
    extrude(amount=CUT_EXTRUDE31_DEPTH, mode=Mode.SUBTRACT)


with BuildPart() as body_2:
    # Sketch38 → Boss-Extrude64 (new body)
    with BuildSketch(Plane(origin=(0, 70, 0), x_dir=(1, 0, 0), z_dir=(0, 1, 0))):
        with Locations(Location((0.690456044, 127.511946758, 0), (0, 0, 270))):
            Circle(SKETCH38_R)
    extrude(amount=-BOSS_EXTRUDE64_DEPTH)


with BuildPart() as body_3:
    # Sketch38 → Boss-Extrude64 2 (new body)
    with BuildSketch(Plane(origin=(0, 70, 0), x_dir=(1, 0, 0), z_dir=(0, 1, 0))):
        with Locations(Location((56.690456044, 101.5250616, 0), (0, 0, 270))):
            Circle(SKETCH38_R)
    extrude(amount=-BOSS_EXTRUDE64_2_DEPTH)


with BuildPart() as body_4:
    # Sketch38 → Boss-Extrude64 3 (new body)
    with BuildSketch(Plane(origin=(0, 70, 0), x_dir=(1, 0, 0), z_dir=(0, 1, 0))):
        with Locations(Location((56.690456044, 28.5250616, 0), (0, 0, 270))):
            Circle(SKETCH38_R)
    extrude(amount=-BOSS_EXTRUDE64_3_DEPTH)


with BuildPart() as body_5:
    # Sketch38 → Boss-Extrude64 4 (new body)
    with BuildSketch(Plane(origin=(0, 70, 0), x_dir=(1, 0, 0), z_dir=(0, 1, 0))):
        with Locations(Location((-53.312713224, 100.011946758, 0), (0, 0, 270))):
            Circle(SKETCH38_R)
    extrude(amount=-BOSS_EXTRUDE64_4_DEPTH)


with BuildPart() as body_6:
    # Sketch38 → Boss-Extrude64 5 (new body)
    with BuildSketch(Plane(origin=(0, 70, 0), x_dir=(1, 0, 0), z_dir=(0, 1, 0))):
        with Locations(Location((-53.312713224, 27.011946758, 0), (0, 0, 270))):
            Circle(SKETCH38_R)
    extrude(amount=-BOSS_EXTRUDE64_5_DEPTH)


with BuildPart() as cut_extrude33_tool:
    # Sketch38<8> → Cut-Extrude33 (new body)
    with BuildSketch(Plane(origin=(0, 70, 0), x_dir=(1, 0, 0), z_dir=(0, 1, 0))):
        with Locations(Location((0.690456044, 127.511946758, 0), (0, 0, 270))):
            Circle(SKETCH38_8_R)
        with Locations(Location((56.690456044, 101.5250616, 0), (0, 0, 270))):
            Circle(SKETCH38_8_R)
        with Locations(Location((56.690456044, 28.5250616, 0), (0, 0, 270))):
            Circle(SKETCH38_8_R)
        with Locations(Location((-53.312713224, 100.011946758, 0), (0, 0, 270))):
            Circle(SKETCH38_8_R)
        with Locations(Location((-53.312713224, 27.011946758, 0), (0, 0, 270))):
            Circle(SKETCH38_8_R)
    extrude(amount=-CUT_EXTRUDE33_DEPTH)


with BuildPart() as part_1:
    add(part.part)

    # Cut-Extrude33: cut by cut_extrude33_tool
    add(cut_extrude33_tool.part, mode=Mode.SUBTRACT)

    # Chamfer1
    # the kernel refuses this chamfer: 3 mm, written as the material it takes off along each edge
    with BuildSketch(Plane(origin=(0, -22.554727349, -21.732917961), x_dir=(-1, 0, 0), z_dir=(0, 0, 1))) as chamfer1_piece_1:
        Polygon((15.877168102 + CHAMFER1_SIZE, 0), (15.877168102, CHAMFER1_SIZE), (15.877168102, 0), align=None)
    revolve(axis=Axis((0, -22.554727349, -21.732917961), (0, -1, 0)), revolution_arc=180, mode=Mode.SUBTRACT)
    with BuildSketch(Plane(origin=(-15.877168102, -22.554727349, 0.873492227), x_dir=(-0.9996219169112965, 0.02749587661058676, 0), z_dir=(0, 0, -1))) as chamfer1_piece_2_section:
        Polygon((CHAMFER1_SIZE * 0.999621916911, -CHAMFER1_SIZE * 0.0274958766106), (-CHAMFER1_SIZE * 0.0274958766106, -CHAMFER1_SIZE * 0.999621916911), (0, 0), align=None)
    chamfer1_piece_2 = extrude(amount=22.606410188, mode=Mode.PRIVATE)
    chamfer1_piece_2 = chamfer1_piece_2 & Plane(origin=(0, -23.57021251, -22.718724839), x_dir=(-0.7071067811865468, 0, 0.7071067811865482), z_dir=(0, -1, 0)) * Cylinder(22.453706462, 58, mode=Mode.PRIVATE)
    add(chamfer1_piece_2, mode=Mode.SUBTRACT)
    with BuildSketch(Plane(origin=(15.877168102, -22.554727349, -21.732917961), x_dir=(0.9996219169112965, 0.02749587661058676, 0), z_dir=(0, 0, 1))) as chamfer1_piece_3_section:
        Polygon((CHAMFER1_SIZE * 0.999621916911, -CHAMFER1_SIZE * 0.0274958766106), (-CHAMFER1_SIZE * 0.0274958766106, -CHAMFER1_SIZE * 0.999621916911), (0, 0), align=None)
    chamfer1_piece_3 = extrude(amount=22.606410188, mode=Mode.PRIVATE)
    chamfer1_piece_3 = chamfer1_piece_3 & Plane(origin=(0, -23.570212508, -22.718724839), x_dir=(-0.7071067811865468, 0, 0.7071067811865482), z_dir=(0, -1, 0)) * Cylinder(22.453706462, 58, mode=Mode.PRIVATE)
    add(chamfer1_piece_3, mode=Mode.SUBTRACT)

    # Fillet1
    # the kernel refuses this fillet: 10 mm, written as the material it takes off along each edge
    with BuildSketch(Plane(origin=(-64.809543956, 95, 1.338053242), x_dir=(1, 0, 0), z_dir=(0, -1, 0))) as fillet1_piece_1:
        with BuildLine():
            CenterArc((FILLET1_R, -FILLET1_R), FILLET1_R, 90, 90)
            Line((0, -FILLET1_R), (0, 0))
            Line((0, 0), (FILLET1_R, 0))
        make_face()
    extrude(amount=122, mode=Mode.SUBTRACT)

    # Fillet2
    # the kernel refuses this fillet: 9 mm, written as the material it takes off along each edge
    with BuildSketch(Plane(origin=(66.190456044, -24.5, 1.338053242), x_dir=(-1, 0, 0), z_dir=(0, 1, 0))) as fillet2_piece_1:
        with BuildLine():
            CenterArc((FILLET2_R, -FILLET2_R), FILLET2_R, 90, 90)
            Line((0, -FILLET2_R), (0, 0))
            Line((0, 0), (FILLET2_R, 0))
        make_face()
    extrude(amount=117, mode=Mode.SUBTRACT)


with BuildPart() as body_2_1:
    add(body_2.part)

    # Cut-Extrude33: cut by cut_extrude33_tool
    add(cut_extrude33_tool.part, mode=Mode.SUBTRACT)


with BuildPart() as body_3_1:
    add(body_3.part)

    # Cut-Extrude33: cut by cut_extrude33_tool
    add(cut_extrude33_tool.part, mode=Mode.SUBTRACT)


with BuildPart() as body_4_1:
    add(body_4.part)

    # Cut-Extrude33: cut by cut_extrude33_tool
    add(cut_extrude33_tool.part, mode=Mode.SUBTRACT)


with BuildPart() as body_5_1:
    add(body_5.part)

    # Cut-Extrude33: cut by cut_extrude33_tool
    add(cut_extrude33_tool.part, mode=Mode.SUBTRACT)


with BuildPart() as body_6_1:
    add(body_6.part)

    # Cut-Extrude33: cut by cut_extrude33_tool
    add(cut_extrude33_tool.part, mode=Mode.SUBTRACT)


solid = Compound([part_1.part, body_2_1.part, body_3_1.part, body_4_1.part, body_5_1.part, body_6_1.part])
